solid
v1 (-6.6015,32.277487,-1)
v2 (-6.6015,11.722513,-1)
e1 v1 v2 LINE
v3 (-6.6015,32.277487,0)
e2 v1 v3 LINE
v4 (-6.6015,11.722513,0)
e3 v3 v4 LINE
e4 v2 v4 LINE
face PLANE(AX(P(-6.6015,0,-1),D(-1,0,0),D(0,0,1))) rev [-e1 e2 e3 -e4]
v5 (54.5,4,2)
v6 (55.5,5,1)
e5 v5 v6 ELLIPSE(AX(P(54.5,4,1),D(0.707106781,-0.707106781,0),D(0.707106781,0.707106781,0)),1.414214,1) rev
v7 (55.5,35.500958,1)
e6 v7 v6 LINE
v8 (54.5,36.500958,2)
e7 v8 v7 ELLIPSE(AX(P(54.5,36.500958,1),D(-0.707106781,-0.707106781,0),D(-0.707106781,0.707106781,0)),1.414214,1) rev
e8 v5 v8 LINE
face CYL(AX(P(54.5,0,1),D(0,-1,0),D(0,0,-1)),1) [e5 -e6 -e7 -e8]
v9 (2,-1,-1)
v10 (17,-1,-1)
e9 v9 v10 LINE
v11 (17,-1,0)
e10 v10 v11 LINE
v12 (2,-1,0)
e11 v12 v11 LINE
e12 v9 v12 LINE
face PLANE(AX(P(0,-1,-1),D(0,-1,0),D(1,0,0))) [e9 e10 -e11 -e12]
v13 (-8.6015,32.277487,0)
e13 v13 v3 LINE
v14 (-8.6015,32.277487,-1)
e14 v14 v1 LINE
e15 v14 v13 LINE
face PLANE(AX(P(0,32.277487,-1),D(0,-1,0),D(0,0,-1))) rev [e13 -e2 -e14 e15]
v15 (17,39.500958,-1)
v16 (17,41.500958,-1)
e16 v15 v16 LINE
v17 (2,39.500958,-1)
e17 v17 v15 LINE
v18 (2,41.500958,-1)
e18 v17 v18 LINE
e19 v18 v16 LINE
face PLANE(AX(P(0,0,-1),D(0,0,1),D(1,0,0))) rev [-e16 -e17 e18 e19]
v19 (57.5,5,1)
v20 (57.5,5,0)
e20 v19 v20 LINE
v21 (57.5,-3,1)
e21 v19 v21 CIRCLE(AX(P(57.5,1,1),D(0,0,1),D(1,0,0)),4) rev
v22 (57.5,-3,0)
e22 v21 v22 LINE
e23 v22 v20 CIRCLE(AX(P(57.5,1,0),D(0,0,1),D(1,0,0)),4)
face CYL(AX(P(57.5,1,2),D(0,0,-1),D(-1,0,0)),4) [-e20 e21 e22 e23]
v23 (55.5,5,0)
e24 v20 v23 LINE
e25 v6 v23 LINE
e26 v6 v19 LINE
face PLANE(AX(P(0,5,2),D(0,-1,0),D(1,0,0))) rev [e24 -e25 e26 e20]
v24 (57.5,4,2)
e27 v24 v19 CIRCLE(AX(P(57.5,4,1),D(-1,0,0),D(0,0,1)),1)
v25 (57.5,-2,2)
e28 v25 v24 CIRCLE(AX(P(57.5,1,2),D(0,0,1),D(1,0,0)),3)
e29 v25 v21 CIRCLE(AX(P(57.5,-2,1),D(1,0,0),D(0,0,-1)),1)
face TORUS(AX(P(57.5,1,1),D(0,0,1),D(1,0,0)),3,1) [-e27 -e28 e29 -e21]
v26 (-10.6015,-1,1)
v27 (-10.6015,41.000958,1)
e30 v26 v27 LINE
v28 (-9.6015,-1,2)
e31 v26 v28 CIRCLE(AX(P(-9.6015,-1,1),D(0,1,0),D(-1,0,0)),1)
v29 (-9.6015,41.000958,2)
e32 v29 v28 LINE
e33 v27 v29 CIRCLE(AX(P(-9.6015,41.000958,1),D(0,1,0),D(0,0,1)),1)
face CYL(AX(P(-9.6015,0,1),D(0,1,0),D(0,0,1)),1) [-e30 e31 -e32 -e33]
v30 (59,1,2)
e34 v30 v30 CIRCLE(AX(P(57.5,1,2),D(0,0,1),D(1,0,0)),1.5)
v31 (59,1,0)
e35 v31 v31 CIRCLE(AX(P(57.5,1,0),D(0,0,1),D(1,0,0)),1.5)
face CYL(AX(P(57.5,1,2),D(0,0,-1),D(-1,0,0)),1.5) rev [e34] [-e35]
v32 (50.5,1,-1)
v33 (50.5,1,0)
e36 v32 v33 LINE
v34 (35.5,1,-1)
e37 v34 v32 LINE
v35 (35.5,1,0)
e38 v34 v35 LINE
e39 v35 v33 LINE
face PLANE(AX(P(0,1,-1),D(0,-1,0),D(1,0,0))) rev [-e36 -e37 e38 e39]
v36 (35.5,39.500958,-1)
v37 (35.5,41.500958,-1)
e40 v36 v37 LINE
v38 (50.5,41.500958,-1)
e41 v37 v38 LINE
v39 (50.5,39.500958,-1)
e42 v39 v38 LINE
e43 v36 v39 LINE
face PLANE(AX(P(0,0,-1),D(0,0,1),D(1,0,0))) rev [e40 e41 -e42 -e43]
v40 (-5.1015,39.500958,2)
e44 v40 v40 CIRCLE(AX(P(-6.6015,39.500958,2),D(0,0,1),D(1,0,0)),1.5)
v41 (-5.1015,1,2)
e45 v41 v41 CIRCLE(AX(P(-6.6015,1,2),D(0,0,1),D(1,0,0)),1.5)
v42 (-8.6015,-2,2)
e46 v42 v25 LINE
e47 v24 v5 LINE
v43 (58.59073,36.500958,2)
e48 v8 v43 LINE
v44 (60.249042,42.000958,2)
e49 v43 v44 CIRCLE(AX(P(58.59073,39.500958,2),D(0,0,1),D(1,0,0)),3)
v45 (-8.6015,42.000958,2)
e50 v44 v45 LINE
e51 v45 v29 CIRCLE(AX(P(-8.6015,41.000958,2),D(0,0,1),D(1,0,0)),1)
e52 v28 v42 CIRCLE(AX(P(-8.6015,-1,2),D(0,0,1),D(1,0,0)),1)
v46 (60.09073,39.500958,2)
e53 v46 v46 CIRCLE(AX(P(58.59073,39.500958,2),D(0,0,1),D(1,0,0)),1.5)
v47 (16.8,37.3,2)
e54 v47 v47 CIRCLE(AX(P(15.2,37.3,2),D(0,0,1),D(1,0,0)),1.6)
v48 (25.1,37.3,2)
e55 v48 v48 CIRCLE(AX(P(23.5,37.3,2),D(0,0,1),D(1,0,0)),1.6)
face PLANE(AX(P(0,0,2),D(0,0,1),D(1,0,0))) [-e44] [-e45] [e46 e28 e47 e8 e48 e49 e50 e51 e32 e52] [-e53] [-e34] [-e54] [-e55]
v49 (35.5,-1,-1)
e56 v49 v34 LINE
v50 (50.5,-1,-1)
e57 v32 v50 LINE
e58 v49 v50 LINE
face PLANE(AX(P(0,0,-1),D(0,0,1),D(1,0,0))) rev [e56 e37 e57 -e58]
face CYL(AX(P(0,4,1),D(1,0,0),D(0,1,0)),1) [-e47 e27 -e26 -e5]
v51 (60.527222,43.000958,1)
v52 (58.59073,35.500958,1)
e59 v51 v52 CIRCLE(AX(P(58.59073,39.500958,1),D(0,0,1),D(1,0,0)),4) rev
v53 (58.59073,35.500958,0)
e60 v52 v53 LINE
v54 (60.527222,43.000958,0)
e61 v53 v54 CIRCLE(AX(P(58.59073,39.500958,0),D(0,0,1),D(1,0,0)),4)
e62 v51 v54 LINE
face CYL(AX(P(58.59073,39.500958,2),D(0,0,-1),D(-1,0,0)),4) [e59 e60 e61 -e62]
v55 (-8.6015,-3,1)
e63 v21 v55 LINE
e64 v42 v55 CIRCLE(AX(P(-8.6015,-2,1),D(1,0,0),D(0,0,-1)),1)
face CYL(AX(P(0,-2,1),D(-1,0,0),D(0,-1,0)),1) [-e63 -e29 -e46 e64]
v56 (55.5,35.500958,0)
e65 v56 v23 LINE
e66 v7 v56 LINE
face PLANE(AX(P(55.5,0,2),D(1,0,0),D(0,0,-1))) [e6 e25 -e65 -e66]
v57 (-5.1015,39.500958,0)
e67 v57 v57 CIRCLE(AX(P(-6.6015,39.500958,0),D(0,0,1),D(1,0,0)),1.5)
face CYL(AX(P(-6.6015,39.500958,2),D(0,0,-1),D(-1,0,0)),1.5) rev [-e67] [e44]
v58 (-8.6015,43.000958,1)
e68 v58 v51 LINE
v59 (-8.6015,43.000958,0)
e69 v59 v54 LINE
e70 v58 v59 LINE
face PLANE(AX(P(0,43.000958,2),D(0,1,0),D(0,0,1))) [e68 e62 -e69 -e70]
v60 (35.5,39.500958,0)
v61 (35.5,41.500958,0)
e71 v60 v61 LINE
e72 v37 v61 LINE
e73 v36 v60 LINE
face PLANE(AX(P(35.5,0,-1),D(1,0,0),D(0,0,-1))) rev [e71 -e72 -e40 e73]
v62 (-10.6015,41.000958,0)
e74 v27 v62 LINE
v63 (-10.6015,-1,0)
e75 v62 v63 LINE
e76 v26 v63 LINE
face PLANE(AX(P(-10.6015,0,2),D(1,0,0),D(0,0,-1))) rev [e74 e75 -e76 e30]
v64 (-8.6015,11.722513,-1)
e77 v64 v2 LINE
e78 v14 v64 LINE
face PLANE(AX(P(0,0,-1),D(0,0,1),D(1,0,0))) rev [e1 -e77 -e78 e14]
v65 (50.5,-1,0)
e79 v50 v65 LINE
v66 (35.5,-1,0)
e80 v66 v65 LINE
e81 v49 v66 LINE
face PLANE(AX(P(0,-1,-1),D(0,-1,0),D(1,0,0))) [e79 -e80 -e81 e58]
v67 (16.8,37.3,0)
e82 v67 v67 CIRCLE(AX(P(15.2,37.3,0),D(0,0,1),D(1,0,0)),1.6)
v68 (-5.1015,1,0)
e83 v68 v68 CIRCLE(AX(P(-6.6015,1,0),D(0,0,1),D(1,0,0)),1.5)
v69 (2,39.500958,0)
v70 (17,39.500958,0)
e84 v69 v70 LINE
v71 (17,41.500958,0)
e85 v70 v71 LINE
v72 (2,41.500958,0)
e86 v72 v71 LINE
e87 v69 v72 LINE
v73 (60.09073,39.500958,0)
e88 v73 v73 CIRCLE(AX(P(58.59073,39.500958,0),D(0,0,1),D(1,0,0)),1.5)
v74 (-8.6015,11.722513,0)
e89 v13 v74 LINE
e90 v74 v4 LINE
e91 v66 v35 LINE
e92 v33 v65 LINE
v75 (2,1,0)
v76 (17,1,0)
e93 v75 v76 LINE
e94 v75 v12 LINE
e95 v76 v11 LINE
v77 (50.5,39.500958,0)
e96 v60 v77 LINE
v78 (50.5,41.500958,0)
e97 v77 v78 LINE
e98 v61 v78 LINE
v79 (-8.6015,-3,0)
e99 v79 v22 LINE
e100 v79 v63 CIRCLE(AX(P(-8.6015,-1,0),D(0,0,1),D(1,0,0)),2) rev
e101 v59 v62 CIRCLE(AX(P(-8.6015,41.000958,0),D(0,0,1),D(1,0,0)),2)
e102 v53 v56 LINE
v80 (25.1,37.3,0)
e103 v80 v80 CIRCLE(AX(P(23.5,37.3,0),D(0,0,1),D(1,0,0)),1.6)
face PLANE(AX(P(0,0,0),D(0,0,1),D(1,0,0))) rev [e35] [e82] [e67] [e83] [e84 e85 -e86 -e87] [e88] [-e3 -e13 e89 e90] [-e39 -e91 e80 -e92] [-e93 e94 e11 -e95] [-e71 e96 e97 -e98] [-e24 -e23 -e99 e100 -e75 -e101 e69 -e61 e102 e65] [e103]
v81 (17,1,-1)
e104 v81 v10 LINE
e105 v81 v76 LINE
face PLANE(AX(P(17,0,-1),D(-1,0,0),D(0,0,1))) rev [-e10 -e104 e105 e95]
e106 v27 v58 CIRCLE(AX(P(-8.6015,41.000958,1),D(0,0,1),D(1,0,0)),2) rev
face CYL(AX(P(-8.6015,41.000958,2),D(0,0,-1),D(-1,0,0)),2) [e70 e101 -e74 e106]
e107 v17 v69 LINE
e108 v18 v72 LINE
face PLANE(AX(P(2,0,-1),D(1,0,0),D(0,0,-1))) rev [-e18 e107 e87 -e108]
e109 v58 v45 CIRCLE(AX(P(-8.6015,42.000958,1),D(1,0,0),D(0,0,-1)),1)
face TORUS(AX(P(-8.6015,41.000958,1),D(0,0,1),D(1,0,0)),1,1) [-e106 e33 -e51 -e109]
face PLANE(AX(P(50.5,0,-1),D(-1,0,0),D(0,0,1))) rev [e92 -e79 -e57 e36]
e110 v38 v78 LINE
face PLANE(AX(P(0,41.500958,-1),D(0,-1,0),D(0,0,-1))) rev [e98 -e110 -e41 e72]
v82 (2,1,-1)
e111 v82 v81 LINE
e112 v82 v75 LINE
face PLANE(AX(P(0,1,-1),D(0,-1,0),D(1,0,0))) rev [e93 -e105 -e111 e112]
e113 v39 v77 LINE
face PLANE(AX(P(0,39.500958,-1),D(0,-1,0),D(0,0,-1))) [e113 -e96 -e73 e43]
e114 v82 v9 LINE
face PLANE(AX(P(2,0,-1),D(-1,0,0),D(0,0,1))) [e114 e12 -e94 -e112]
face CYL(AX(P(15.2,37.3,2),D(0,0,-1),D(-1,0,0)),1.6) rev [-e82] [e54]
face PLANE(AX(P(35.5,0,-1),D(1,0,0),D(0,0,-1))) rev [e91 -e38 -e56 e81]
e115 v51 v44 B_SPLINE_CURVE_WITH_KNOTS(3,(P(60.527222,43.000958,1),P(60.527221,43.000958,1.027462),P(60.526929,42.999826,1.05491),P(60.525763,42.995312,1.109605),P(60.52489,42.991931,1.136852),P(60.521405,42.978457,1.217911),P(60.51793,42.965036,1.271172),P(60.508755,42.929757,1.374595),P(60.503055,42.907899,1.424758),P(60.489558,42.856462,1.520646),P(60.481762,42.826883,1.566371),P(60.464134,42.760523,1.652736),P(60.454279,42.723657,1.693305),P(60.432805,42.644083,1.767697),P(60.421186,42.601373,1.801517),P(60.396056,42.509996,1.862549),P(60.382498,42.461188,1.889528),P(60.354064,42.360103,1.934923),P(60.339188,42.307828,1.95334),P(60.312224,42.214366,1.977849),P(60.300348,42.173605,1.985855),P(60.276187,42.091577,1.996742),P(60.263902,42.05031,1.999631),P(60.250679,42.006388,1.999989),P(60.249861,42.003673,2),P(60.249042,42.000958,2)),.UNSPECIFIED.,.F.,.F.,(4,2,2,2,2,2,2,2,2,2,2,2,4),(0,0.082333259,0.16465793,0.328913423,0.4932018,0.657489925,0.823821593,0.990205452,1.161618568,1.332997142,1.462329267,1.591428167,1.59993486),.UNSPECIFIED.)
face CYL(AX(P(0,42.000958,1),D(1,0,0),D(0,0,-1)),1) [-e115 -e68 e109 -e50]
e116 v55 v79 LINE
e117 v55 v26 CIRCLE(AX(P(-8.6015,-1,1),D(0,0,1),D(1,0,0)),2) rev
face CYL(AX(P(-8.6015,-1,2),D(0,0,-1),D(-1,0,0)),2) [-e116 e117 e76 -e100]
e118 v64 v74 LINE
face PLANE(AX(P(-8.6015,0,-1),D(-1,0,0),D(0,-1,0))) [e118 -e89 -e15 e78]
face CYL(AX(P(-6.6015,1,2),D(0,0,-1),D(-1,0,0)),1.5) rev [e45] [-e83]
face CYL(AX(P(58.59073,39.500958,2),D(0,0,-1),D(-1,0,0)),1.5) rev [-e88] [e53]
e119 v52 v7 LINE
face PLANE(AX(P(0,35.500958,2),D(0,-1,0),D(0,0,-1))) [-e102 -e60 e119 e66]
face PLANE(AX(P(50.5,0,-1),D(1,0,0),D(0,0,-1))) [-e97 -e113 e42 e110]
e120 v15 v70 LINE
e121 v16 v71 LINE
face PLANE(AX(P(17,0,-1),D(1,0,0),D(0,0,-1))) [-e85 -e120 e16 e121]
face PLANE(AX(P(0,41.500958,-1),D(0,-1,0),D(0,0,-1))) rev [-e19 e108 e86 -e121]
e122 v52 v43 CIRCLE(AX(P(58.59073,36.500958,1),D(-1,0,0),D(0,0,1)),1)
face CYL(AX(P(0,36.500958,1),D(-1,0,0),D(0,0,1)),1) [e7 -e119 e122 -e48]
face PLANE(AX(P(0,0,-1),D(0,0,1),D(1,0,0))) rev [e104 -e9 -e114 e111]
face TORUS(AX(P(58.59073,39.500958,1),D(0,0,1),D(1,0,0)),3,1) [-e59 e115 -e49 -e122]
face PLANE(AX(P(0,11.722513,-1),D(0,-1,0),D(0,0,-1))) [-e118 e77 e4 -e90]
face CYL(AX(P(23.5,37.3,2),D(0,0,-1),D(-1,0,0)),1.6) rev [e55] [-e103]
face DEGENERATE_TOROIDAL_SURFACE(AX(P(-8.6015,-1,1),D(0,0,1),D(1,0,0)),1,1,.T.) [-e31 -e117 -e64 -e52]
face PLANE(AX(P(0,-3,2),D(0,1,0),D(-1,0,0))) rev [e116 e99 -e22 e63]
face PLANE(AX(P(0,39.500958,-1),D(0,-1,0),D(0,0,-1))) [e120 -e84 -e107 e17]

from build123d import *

# Parameters (mm, degrees)
SKETCH_2_R      = 1.5
SKETCH_2_R_2    = 1.6
EXTRUDE_1_DEPTH = 2
SKETCH_2_6_W    = 15
SKETCH_2_6_H    = 2
SKETCH_2_6_W_2  = 2
SKETCH_2_6_H_2  = 20.554974884
EXTRUDE_2_DEPTH = 1
FILLET_1_R      = 1


with BuildPart() as part:
    # 草图2 → 凸台-拉伸1 (new body)
    with BuildSketch(Plane.XY):
        with BuildLine():
            ThreePointArc((-10.601500464, -1), (-10.015714027, -2.414213562), (-8.601500464, -3))
            Line((-8.601500464, -3), (57.5, -3))
            ThreePointArc((57.5, -3), (61.5, 1), (57.5, 5))
            Line((57.5, 5), (55.5, 5))
            Line((55.5, 5), (55.5, 35.50095784))
            Line((55.5, 35.50095784), (58.590729836, 35.50095784))
            ThreePointArc((58.590729836, 35.50095784), (62.463713182, 38.50095784), (60.527221509, 43.00095784))
            Line((60.527221509, 43.00095784), (-8.601500464, 43.00095784))
            ThreePointArc((-8.601500464, 43.00095784), (-10.015714027, 42.415171403), (-10.601500464, 41.00095784))
            Line((-10.601500464, 41.00095784), (-10.601500464, -1))
        make_face()
        with Locations((-6.601500464, 1)):
            Circle(SKETCH_2_R, mode=Mode.SUBTRACT)
        with Locations((57.5, 1)):
            Circle(SKETCH_2_R, mode=Mode.SUBTRACT)
        with Locations((-6.601500464, 39.50095784)):
            Circle(SKETCH_2_R, mode=Mode.SUBTRACT)
        with Locations((15.2, 37.3)):
            Circle(SKETCH_2_R_2, mode=Mode.SUBTRACT)
        with Locations((23.5, 37.3)):
            Circle(SKETCH_2_R_2, mode=Mode.SUBTRACT)
        with Locations((58.590729836, 39.50095784)):
            Circle(SKETCH_2_R, mode=Mode.SUBTRACT)
    extrude(amount=EXTRUDE_1_DEPTH)

    # 草图2<6> → 凸台-拉伸2 (add)
    with BuildSketch(Plane.XY):
        with Locations((9.5, 40.50095784)):
            Rectangle(SKETCH_2_6_W, SKETCH_2_6_H)
        with Locations((-7.601500464, 22)):
            Rectangle(SKETCH_2_6_W_2, SKETCH_2_6_H_2)
        with Locations((43, 40.50095784)):
            Rectangle(SKETCH_2_6_W, SKETCH_2_6_H)
        with Locations((9.5, 0)):
            Rectangle(SKETCH_2_6_W, SKETCH_2_6_H)
        with Locations((43, 0)):
            Rectangle(SKETCH_2_6_W, SKETCH_2_6_H)
    extrude(amount=-EXTRUDE_2_DEPTH)

    # 圆角1
    # the kernel refuses this fillet: 1 mm, written as the material it takes off along each edge
    with BuildSketch(Plane(origin=(-8.601500464, -1, 2), x_dir=(-1, 0, 0), z_dir=(0, 1, 0))) as fillet_1_piece_1:
        with BuildLine():
            CenterArc((2 - FILLET_1_R, -FILLET_1_R), FILLET_1_R, 0, 90)
            Line((2 - FILLET_1_R, 0), (2, 0))
            Line((2, 0), (2, -FILLET_1_R))
        make_face()
    revolve(axis=Axis((-8.601500464, -1, 2), (0, 0, 1)), revolution_arc=90, mode=Mode.SUBTRACT)
    with BuildSketch(Plane(origin=(-8.601500464, -3, 2), x_dir=(0, 0, -1), z_dir=(1, 0, 0))) as fillet_1_piece_2:
        with BuildLine():
            CenterArc((FILLET_1_R, FILLET_1_R), FILLET_1_R, 180, 90)
            Line((0, FILLET_1_R), (0, 0))
            Line((0, 0), (FILLET_1_R, 0))
        make_face()
    extrude(amount=66.101500464, mode=Mode.SUBTRACT)
    with BuildSketch(Plane(origin=(57.5, 1, 2), x_dir=(0, -1, 0), z_dir=(-1, 0, 0))) as fillet_1_piece_3:
        with BuildLine():
            CenterArc((4 - FILLET_1_R, -FILLET_1_R), FILLET_1_R, 0, 90)
            Line((4, -FILLET_1_R), (4, 0))
            Line((4, 0), (4 - FILLET_1_R, 0))
        make_face()
    revolve(axis=Axis((57.5, 1, 2), (0, 0, 1)), revolution_arc=180, mode=Mode.SUBTRACT)
    with BuildSketch(Plane(origin=(57.5, 5, 2), x_dir=(0, -1, 0), z_dir=(-1, 0, 0))) as fillet_1_piece_4:
        with BuildLine():
            CenterArc((FILLET_1_R, -FILLET_1_R), FILLET_1_R, 90, 90)
            Line((0, -FILLET_1_R), (0, 0))
            Line((0, 0), (FILLET_1_R, 0))
        make_face()
    extrude(amount=2, mode=Mode.SUBTRACT)
    with BuildSketch(Plane(origin=(55.5, 5, 2), x_dir=(-1, 0, 0), z_dir=(0, 1, 0))) as fillet_1_piece_5:
        with BuildLine():
            CenterArc((FILLET_1_R, -FILLET_1_R), FILLET_1_R, 90, 90)
            Line((0, -FILLET_1_R), (0, 0))
            Line((0, 0), (FILLET_1_R, 0))
        make_face()
    extrude(amount=30.50095784, mode=Mode.SUBTRACT)
    with BuildSketch(Plane(origin=(55.5, 35.50095784, 2), x_dir=(0, 1, 0), z_dir=(1, 0, 0))) as fillet_1_piece_6:
        with BuildLine():
            CenterArc((FILLET_1_R, -FILLET_1_R), FILLET_1_R, 90, 90)
            Line((0, -FILLET_1_R), (0, 0))
            Line((0, 0), (FILLET_1_R, 0))
        make_face()
    extrude(amount=3.090729836, mode=Mode.SUBTRACT)
    with BuildSketch(Plane(origin=(58.590729836, 39.50095784, 2), x_dir=(0, -1, 0), z_dir=(-1, 0, 0))) as fillet_1_piece_7:
        with BuildLine():
            CenterArc((4 - FILLET_1_R, -FILLET_1_R), FILLET_1_R, 0, 90)
            Line((4, -FILLET_1_R), (4, 0))
            Line((4, 0), (4 - FILLET_1_R, 0))
        make_face()
    revolve(axis=Axis((58.590729836, 39.50095784, 2), (0, 0, 1)), revolution_arc=186.895375862, mode=Mode.SUBTRACT)
    with BuildSketch(Plane(origin=(63.027221509, 43.00095784, 2), x_dir=(0, -1, 0), z_dir=(-1, 0, 0))) as fillet_1_piece_8:
        with BuildLine():
            CenterArc((FILLET_1_R, -FILLET_1_R), FILLET_1_R, 90, 90)
            Line((0, -FILLET_1_R), (0, 0))
            Line((0, 0), (FILLET_1_R, 0))
        make_face()
    extrude(amount=71.628721973, mode=Mode.SUBTRACT)
    with BuildSketch(Plane(origin=(-8.601500464, 41.00095784, 2), x_dir=(0, 1, 0), z_dir=(1, 0, 0))) as fillet_1_piece_9:
        with BuildLine():
            CenterArc((2 - FILLET_1_R, -FILLET_1_R), FILLET_1_R, 0, 90)
            Line((2, -FILLET_1_R), (2, 0))
            Line((2, 0), (2 - FILLET_1_R, 0))
        make_face()
    revolve(axis=Axis((-8.601500464, 41.00095784, 2), (0, 0, 1)), revolution_arc=90, mode=Mode.SUBTRACT)
    with BuildSketch(Plane(origin=(-10.601500464, 41.00095784, 2), x_dir=(0, 0, -1), z_dir=(0, -1, 0))) as fillet_1_piece_10:
        with BuildLine():
            CenterArc((FILLET_1_R, FILLET_1_R), FILLET_1_R, 180, 90)
            Line((0, FILLET_1_R), (0, 0))
            Line((0, 0), (FILLET_1_R, 0))
        make_face()
    extrude(amount=42.00095784, mode=Mode.SUBTRACT)
    with BuildSketch(Plane(origin=(57.5, 5, 2), x_dir=(0, -1, 0), z_dir=(-1, 0, 0))) as fillet_1_piece_11a_section:
        with BuildLine():
            CenterArc((FILLET_1_R, -FILLET_1_R), FILLET_1_R, 90, 90)
            Line((0, -FILLET_1_R), (0, 0))
            Line((0, 0), (FILLET_1_R, 0))
        make_face()
    fillet_1_piece_11a = extrude(amount=4.5, mode=Mode.PRIVATE)
    fillet_1_piece_11a = split(fillet_1_piece_11a, bisect_by=Plane(origin=(55.5, 4.773604886, 1.773604886), z_dir=(-1, 0, 0)), keep=Keep.TOP, mode=Mode.PRIVATE)
    with BuildSketch(Plane(origin=(55.5, 2.5, 2), x_dir=(-1, 0, 0), z_dir=(0, 1, 0))) as fillet_1_piece_11b_section:
        with BuildLine():
            CenterArc((FILLET_1_R, -FILLET_1_R), FILLET_1_R, 90, 90)
            Line((0, -FILLET_1_R), (0, 0))
            Line((0, 0), (FILLET_1_R, 0))
        make_face()
    fillet_1_piece_11b = extrude(amount=33.00095784, mode=Mode.PRIVATE)
    fillet_1_piece_11b = split(fillet_1_piece_11b, bisect_by=Plane(origin=(55.273604886, 5, 1.773604886), z_dir=(0, -1, 0)), keep=Keep.TOP, mode=Mode.PRIVATE)
    fillet_1_piece_11 = fillet_1_piece_11a & fillet_1_piece_11b
    add(fillet_1_piece_11, mode=Mode.SUBTRACT)
    with BuildSketch(Plane(origin=(55.5, 5, 2), x_dir=(-1, 0, 0), z_dir=(0, 1, 0))) as fillet_1_piece_12a_section:
        with BuildLine():
            CenterArc((FILLET_1_R, -FILLET_1_R), FILLET_1_R, 90, 90)
            Line((0, -FILLET_1_R), (0, 0))
            Line((0, 0), (FILLET_1_R, 0))
        make_face()
    fillet_1_piece_12a = extrude(amount=33.00095784, mode=Mode.PRIVATE)
    fillet_1_piece_12a = split(fillet_1_piece_12a, bisect_by=Plane(origin=(55.273604886, 35.50095784, 1.773604886), z_dir=(0, 1, 0)), keep=Keep.TOP, mode=Mode.PRIVATE)
    with BuildSketch(Plane(origin=(53, 35.50095784, 2), x_dir=(0, 1, 0), z_dir=(1, 0, 0))) as fillet_1_piece_12b_section:
        with BuildLine():
            CenterArc((FILLET_1_R, -FILLET_1_R), FILLET_1_R, 90, 90)
            Line((0, -FILLET_1_R), (0, 0))
            Line((0, 0), (FILLET_1_R, 0))
        make_face()
    fillet_1_piece_12b = extrude(amount=5.590729836, mode=Mode.PRIVATE)
    fillet_1_piece_12b = split(fillet_1_piece_12b, bisect_by=Plane(origin=(55.5, 35.727352955, 1.773604886), z_dir=(-1, 0, 0)), keep=Keep.TOP, mode=Mode.PRIVATE)
    fillet_1_piece_12 = fillet_1_piece_12a & fillet_1_piece_12b
    add(fillet_1_piece_12, mode=Mode.SUBTRACT)


solid = part.part
